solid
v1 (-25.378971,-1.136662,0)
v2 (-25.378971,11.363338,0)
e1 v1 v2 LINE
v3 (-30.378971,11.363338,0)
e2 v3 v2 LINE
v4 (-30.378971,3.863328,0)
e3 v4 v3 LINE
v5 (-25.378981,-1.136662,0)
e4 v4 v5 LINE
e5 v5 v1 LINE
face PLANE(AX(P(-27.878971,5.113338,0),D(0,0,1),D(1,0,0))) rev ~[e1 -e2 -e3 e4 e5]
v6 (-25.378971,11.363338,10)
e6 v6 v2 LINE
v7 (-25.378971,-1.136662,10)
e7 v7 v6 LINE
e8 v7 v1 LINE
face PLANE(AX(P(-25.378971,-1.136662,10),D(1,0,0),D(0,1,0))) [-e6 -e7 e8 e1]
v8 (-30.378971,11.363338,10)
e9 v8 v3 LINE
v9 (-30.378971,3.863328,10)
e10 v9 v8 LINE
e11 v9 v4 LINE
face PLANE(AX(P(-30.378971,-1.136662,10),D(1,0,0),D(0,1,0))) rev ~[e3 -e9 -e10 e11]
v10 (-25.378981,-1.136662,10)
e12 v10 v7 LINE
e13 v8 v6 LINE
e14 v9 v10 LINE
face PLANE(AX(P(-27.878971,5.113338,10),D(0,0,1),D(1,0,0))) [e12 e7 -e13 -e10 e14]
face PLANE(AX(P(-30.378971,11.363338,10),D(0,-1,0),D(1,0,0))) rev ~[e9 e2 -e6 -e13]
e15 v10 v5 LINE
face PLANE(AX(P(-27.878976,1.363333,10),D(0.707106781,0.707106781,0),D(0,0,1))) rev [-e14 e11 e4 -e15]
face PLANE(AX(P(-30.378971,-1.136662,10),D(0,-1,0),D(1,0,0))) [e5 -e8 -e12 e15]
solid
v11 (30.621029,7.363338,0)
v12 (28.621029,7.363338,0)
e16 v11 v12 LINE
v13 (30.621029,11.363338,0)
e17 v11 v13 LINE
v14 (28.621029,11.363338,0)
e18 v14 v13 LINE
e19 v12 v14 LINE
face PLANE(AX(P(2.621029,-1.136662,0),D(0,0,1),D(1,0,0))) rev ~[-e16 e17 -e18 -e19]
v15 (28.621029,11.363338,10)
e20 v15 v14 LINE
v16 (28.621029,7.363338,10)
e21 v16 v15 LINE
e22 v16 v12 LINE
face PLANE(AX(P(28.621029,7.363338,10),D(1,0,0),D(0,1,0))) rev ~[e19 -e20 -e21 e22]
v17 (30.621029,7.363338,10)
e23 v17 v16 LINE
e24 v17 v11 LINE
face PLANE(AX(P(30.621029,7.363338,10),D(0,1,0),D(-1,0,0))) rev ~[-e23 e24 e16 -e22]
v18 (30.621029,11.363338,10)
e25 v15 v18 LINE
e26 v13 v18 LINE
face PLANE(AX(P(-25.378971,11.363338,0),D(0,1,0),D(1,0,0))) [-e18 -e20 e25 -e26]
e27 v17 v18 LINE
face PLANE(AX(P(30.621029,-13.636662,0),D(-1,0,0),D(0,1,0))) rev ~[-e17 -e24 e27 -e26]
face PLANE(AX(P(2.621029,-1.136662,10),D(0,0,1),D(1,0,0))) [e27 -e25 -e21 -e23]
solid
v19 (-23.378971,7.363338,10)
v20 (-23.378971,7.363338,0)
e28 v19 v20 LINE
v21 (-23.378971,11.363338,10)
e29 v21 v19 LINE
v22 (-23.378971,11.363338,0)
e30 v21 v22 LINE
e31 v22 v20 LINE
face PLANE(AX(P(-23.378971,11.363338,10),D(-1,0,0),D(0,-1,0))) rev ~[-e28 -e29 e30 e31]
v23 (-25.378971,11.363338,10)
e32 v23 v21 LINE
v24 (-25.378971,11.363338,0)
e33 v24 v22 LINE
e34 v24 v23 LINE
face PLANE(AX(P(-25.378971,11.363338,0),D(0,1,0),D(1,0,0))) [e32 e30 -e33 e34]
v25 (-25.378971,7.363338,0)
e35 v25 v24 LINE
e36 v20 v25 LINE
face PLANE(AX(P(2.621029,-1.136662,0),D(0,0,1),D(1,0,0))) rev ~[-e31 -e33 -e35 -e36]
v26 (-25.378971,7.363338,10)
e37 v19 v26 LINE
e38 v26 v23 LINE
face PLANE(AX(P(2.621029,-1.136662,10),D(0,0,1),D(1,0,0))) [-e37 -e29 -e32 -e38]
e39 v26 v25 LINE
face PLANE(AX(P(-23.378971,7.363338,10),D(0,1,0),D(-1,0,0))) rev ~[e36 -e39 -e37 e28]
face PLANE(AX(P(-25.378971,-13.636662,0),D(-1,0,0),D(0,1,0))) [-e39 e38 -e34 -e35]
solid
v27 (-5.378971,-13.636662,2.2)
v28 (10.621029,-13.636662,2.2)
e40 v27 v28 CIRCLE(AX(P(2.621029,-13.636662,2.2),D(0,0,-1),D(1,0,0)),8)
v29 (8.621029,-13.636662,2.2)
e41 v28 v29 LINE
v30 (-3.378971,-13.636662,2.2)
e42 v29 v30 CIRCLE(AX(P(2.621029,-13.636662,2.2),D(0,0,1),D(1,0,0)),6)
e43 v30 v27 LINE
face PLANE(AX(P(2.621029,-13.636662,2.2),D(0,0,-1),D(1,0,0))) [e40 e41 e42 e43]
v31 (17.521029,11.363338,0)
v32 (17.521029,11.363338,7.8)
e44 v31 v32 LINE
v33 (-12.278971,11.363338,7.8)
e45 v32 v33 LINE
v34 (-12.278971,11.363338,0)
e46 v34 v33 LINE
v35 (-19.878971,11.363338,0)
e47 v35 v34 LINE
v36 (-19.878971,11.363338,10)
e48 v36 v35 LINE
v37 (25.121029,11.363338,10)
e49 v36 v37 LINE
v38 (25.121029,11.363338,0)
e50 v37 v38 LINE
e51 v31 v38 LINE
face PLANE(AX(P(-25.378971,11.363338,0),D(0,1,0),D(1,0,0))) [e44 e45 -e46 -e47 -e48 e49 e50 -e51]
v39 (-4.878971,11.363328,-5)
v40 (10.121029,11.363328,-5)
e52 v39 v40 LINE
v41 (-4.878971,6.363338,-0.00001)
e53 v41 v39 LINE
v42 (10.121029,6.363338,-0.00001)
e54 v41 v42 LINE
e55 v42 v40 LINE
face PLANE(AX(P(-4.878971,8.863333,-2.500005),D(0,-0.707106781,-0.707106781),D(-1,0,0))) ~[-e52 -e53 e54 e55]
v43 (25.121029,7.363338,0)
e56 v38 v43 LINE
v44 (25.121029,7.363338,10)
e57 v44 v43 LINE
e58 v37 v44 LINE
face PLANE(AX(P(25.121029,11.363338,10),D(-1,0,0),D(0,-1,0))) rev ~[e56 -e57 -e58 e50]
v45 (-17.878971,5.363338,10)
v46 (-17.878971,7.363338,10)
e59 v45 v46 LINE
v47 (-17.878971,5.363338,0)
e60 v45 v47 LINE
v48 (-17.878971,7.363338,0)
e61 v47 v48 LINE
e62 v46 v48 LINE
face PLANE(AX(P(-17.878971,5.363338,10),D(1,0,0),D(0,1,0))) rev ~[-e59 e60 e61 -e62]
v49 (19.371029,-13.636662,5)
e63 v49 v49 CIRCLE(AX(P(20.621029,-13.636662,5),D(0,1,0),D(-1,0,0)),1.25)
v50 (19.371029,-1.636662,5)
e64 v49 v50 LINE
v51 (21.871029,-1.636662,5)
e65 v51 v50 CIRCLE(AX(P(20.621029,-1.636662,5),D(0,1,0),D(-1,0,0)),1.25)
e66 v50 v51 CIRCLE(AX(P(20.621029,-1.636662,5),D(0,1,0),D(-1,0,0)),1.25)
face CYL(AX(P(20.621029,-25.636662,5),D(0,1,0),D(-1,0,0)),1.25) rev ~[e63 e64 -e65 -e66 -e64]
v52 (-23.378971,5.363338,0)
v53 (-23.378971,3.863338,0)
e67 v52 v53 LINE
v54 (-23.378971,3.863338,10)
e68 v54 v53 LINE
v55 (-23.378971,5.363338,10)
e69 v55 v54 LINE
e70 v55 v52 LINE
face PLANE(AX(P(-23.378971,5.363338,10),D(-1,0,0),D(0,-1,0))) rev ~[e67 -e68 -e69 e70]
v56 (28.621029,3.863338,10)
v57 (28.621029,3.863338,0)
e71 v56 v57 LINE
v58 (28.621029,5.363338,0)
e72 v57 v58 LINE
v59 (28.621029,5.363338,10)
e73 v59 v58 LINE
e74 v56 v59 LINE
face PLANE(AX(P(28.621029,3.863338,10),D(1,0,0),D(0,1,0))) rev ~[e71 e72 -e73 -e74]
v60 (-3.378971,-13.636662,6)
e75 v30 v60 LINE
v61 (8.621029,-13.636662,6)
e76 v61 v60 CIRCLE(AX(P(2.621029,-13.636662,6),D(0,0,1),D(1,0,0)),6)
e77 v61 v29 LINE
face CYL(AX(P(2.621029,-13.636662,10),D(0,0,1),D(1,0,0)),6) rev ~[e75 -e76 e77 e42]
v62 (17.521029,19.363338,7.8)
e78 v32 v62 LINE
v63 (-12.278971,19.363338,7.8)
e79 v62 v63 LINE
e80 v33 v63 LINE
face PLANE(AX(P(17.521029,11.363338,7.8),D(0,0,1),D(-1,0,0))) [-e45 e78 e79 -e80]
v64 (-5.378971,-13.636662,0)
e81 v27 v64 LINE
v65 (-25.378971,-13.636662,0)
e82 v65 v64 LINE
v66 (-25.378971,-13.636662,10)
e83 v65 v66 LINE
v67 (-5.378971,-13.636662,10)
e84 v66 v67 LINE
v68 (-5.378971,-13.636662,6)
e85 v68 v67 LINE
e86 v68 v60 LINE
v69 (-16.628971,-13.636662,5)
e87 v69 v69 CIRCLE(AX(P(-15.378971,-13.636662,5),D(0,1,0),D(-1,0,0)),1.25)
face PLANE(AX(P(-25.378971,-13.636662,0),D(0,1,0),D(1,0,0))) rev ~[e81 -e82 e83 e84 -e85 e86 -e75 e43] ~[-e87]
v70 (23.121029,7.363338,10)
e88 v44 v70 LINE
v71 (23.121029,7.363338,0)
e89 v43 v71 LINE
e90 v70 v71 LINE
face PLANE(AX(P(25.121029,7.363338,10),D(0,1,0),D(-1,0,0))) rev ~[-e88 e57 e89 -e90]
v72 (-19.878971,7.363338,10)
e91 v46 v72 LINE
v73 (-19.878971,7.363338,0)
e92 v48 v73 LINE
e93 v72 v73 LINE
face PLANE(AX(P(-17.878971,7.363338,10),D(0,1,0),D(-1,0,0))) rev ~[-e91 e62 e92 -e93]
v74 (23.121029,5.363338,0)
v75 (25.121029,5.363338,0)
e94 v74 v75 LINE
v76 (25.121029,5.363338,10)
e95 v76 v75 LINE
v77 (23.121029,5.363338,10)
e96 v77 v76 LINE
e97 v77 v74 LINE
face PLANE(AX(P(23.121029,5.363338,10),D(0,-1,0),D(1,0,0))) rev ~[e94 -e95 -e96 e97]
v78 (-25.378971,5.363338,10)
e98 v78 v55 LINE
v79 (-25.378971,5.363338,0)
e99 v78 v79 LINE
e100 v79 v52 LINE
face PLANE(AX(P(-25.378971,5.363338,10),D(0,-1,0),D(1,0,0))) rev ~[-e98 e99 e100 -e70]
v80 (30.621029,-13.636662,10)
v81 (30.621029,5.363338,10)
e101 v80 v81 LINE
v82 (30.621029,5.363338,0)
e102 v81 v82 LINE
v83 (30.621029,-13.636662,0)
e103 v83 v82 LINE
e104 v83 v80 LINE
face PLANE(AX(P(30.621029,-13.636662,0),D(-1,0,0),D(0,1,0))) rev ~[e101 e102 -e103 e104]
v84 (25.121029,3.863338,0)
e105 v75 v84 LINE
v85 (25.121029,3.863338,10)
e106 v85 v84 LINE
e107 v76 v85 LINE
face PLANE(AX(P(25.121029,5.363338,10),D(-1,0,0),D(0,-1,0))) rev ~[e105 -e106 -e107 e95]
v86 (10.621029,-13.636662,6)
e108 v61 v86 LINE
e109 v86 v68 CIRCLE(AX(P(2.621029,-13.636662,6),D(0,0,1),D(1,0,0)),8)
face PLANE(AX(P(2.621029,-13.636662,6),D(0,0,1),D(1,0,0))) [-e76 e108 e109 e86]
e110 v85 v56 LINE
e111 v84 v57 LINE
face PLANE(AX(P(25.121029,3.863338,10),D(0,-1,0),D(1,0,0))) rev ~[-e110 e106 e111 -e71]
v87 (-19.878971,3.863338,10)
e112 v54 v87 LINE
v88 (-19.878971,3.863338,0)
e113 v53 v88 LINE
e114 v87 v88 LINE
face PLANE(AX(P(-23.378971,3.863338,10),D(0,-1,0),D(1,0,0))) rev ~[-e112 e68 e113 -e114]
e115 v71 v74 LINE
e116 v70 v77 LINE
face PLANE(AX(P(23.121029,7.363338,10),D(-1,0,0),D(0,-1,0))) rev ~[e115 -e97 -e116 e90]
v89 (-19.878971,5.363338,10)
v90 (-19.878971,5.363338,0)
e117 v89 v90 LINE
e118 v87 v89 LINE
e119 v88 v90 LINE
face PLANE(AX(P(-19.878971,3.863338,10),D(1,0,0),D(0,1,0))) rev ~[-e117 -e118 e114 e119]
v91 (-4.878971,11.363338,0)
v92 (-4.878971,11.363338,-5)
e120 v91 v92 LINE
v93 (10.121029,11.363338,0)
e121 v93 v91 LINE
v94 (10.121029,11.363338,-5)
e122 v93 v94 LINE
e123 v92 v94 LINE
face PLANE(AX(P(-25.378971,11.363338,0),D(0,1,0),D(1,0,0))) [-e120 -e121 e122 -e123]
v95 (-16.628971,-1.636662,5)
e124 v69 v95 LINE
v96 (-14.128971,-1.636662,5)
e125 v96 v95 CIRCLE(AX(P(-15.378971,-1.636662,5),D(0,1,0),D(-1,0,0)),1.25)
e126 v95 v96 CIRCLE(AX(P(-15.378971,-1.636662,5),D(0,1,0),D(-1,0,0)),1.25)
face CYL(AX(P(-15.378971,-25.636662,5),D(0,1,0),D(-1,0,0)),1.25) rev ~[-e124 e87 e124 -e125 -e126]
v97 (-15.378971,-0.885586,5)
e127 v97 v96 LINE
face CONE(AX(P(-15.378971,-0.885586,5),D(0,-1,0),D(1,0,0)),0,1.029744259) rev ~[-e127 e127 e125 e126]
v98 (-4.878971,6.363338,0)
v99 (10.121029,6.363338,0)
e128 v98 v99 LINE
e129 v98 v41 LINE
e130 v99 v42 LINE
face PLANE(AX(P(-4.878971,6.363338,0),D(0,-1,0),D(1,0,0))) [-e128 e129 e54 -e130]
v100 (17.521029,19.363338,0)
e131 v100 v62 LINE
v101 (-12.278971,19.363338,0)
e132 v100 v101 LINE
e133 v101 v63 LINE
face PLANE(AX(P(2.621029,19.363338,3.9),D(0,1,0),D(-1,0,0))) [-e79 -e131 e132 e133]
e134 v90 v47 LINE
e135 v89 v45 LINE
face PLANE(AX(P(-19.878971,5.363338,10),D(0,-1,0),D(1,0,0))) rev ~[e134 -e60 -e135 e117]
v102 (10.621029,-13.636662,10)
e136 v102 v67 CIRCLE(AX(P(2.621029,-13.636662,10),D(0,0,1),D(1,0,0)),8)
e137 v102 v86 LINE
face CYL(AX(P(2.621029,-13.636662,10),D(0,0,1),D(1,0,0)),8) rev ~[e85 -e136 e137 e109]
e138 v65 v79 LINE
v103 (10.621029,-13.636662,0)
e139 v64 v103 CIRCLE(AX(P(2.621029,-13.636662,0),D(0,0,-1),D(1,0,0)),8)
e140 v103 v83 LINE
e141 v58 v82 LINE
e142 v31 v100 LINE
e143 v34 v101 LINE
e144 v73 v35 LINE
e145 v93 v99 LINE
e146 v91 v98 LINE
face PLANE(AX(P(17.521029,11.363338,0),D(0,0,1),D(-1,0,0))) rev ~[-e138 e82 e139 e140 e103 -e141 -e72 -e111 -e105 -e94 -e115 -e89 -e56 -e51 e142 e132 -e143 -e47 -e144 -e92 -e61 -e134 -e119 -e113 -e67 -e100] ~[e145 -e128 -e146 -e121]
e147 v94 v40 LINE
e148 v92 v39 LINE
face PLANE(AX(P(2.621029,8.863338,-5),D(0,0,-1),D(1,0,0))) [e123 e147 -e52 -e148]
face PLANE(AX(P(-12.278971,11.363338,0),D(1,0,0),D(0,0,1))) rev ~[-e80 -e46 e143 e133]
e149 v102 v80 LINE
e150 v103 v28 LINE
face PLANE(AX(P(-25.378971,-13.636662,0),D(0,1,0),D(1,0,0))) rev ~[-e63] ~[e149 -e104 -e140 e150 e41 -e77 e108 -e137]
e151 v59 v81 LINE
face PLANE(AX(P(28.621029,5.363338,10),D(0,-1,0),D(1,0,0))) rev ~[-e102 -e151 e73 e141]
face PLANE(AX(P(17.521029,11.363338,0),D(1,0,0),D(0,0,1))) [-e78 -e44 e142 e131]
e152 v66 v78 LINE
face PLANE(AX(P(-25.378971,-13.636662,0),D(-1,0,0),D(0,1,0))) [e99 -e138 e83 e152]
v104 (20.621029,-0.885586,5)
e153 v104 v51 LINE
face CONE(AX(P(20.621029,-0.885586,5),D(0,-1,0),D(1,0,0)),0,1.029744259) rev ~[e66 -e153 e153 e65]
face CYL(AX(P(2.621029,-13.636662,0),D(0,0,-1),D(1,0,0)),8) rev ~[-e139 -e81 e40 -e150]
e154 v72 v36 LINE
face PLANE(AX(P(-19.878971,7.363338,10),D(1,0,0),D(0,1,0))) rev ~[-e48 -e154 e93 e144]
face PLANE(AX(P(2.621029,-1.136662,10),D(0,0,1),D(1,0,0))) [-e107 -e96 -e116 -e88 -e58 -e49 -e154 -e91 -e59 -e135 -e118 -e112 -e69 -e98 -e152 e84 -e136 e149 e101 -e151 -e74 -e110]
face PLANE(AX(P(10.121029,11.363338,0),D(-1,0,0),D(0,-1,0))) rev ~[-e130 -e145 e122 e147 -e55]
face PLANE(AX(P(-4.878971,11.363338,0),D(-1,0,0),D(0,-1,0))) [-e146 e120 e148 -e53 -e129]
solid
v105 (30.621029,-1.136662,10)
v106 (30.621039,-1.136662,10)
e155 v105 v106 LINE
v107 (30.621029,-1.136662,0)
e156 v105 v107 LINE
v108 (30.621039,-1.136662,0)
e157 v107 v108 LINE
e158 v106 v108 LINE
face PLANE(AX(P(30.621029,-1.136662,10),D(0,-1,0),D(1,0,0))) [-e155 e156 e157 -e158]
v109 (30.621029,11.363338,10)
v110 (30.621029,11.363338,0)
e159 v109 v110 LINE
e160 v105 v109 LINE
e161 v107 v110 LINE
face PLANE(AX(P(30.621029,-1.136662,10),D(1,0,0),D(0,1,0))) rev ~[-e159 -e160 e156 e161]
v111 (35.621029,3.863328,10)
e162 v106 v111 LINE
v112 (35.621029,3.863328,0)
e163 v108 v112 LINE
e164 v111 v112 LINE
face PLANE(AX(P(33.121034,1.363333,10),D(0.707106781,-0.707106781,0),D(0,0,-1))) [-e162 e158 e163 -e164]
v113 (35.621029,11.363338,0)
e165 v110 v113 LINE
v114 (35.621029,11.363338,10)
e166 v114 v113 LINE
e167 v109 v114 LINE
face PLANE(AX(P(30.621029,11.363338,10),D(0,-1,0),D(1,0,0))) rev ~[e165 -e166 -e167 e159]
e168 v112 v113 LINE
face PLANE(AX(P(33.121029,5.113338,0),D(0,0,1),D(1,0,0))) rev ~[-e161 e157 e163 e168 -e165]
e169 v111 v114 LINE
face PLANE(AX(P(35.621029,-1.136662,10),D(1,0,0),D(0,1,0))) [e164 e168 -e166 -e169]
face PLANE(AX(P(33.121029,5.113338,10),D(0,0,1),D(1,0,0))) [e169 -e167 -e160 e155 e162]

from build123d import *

# Parameters (mm, degrees)
F0_W       = 56
F0_H       = 25
F1_DEPTH   = 10
F3_DEPTH   = 25
F5_DEPTH   = 25
F6_R       = 6
F7_DEPTH   = 25
F8_R       = 8
F9_DEPTH   = 4
F10_R      = 8
F11_DEPTH  = 2.2
F13_D      = 2.5
F13_DEPTH  = 12
F13_TIP    = 0.7510757738
F14_W      = 15
F14_H      = 5
F15_DEPTH  = 5
F16_SIZE   = 4.99999
F17_W      = 5
F17_H      = 12.5
F18_DEPTH  = 10
F19_SIZE   = 4.99999
F19_2_SIZE = 4.99999
F20_W      = 29.8
F20_H      = 7.8
F21_DEPTH  = 8


# Not quite as in the source:
# - a fillet or chamfer is up to 0.001 mm smaller than in the source, because OpenCascade refuses the exact size


with BuildPart() as f1:
    # F0 (on Top) → F1 (new body)
    with BuildSketch(Plane.XY):
        with Locations((2.6210285723, -1.1366620937)):
            Rectangle(F0_W, F0_H)
    extrude(amount=F1_DEPTH)

    # F2 (on face) → F3 (cut)
    with BuildSketch(Plane.XY.offset(10)):
        Polygon((28.6210285723, 7.3633379063), (28.6210285723, 11.3633379063), (25.1210285723, 11.3633379063), (25.1210285723, 7.3633379063), (23.1210285723, 7.3633379063), (23.1210285723, 5.3633379063), (25.1210285723, 5.3633379063), (25.1210285723, 3.8633379063), (28.6210285723, 3.8633379063), (28.6210285723, 5.3633379063), (30.6210285723, 5.3633379063), (30.6210285723, 7.3633379063), align=None)
    extrude(amount=-F3_DEPTH, mode=Mode.SUBTRACT)

    # F4 (on face) → F5 (cut)
    with BuildSketch(Plane.XY.offset(10)):
        Polygon((-19.8789714277, 7.3633379063), (-19.8789714277, 11.3633379063), (-23.3789714277, 11.3633379063), (-23.3789714277, 7.3633379063), (-25.3789714277, 7.3633379063), (-25.3789714277, 5.3633379063), (-23.3789714277, 5.3633379063), (-23.3789714277, 3.8633379063), (-19.8789714277, 3.8633379063), (-19.8789714277, 5.3633379063), (-17.8789714277, 5.3633379063), (-17.8789714277, 7.3633379063), align=None)
    extrude(amount=-F5_DEPTH, mode=Mode.SUBTRACT)

    # F6 (on face) → F7 (cut)
    with BuildSketch(Plane.XY.offset(10)):
        with Locations((2.6210285723, -13.6366620937)):
            Circle(F6_R)
    extrude(amount=-F7_DEPTH, mode=Mode.SUBTRACT)

    # F8 (on face) → F9 (cut)
    with BuildSketch(Plane.XY.offset(10)):
        with Locations((2.6210285723, -13.6366620937)):
            Circle(F8_R)
    extrude(amount=-F9_DEPTH, mode=Mode.SUBTRACT)

    # F10 (on face) → F11 (cut)
    with BuildSketch(Plane(origin=(0, 0, 0), x_dir=(1, 0, 0), z_dir=(0, 0, -1))):
        with Locations((2.6210285723, 13.6366620937)):
            Circle(F10_R)
    extrude(amount=-F11_DEPTH, mode=Mode.SUBTRACT)

    # F13
    with Locations(Plane.XZ.offset(13.6366620937)):
        with Locations((-15.3789714277, 5), (20.6210285723, 5)):
            Hole(F13_D / 2, depth=F13_DEPTH)
            with Locations((0, 0, -(F13_DEPTH + F13_TIP / 2))):  # 118° drill point
                Cone(0, F13_D / 2, F13_TIP, mode=Mode.SUBTRACT)

    # F14 (on face) → F15 (join)
    with BuildSketch(Plane(origin=(0, 0, 0), x_dir=(1, 0, 0), z_dir=(0, 0, -1))):
        with Locations((2.6210285723, -8.8633379063)):
            Rectangle(F14_W, F14_H)
    extrude(amount=F15_DEPTH)

    # F16 (size 5 in the source; OpenCascade refuses exactly that, so slightly less here)
    f16_edges = [f1.edges().sort_by_distance(p)[0] for p in [
        (2.621029, 6.363338, -5),
    ]]
    chamfer(f16_edges, length=F16_SIZE)

    # F20 (on face) → F21 (join)
    with BuildSketch(Plane(origin=(0, 11.3633379063, 0), x_dir=(-1, 0, 0), z_dir=(0, 1, 0))):
        with Locations((-2.6210285723, 3.9)):
            Rectangle(F20_W, F20_H)
    extrude(amount=F21_DEPTH)


with BuildPart() as f18:
    # F17 (on face) → F18 (new body)
    with BuildSketch(Plane.XY.offset(10)):
        with Locations((-27.8789714277, 5.1133379063)):
            Rectangle(F17_W, F17_H)
    extrude(amount=-F18_DEPTH)

    # F19#2 (size 5 in the source; OpenCascade refuses exactly that, so slightly less here)
    f19_2_edges = [f18.edges().sort_by_distance(p)[0] for p in [
        (-30.378971, -1.136662, 5),
    ]]
    chamfer(f19_2_edges, length=F19_2_SIZE)


with BuildPart() as f18b:
    # F17 (on face) → F18, piece 2 (new body)
    with BuildSketch(Plane.XY.offset(10)):
        with Locations((33.1210285723, 5.1133379063)):
            Rectangle(F17_W, F17_H)
    extrude(amount=-F18_DEPTH)

    # F19 (size 5 in the source; OpenCascade refuses exactly that, so slightly less here)
    f19_edges = [f18b.edges().sort_by_distance(p)[0] for p in [
        (35.621029, -1.136662, 5),
    ]]
    chamfer(f19_edges, length=F19_SIZE)


solid = Compound([f1.part, f18.part, f18b.part])
